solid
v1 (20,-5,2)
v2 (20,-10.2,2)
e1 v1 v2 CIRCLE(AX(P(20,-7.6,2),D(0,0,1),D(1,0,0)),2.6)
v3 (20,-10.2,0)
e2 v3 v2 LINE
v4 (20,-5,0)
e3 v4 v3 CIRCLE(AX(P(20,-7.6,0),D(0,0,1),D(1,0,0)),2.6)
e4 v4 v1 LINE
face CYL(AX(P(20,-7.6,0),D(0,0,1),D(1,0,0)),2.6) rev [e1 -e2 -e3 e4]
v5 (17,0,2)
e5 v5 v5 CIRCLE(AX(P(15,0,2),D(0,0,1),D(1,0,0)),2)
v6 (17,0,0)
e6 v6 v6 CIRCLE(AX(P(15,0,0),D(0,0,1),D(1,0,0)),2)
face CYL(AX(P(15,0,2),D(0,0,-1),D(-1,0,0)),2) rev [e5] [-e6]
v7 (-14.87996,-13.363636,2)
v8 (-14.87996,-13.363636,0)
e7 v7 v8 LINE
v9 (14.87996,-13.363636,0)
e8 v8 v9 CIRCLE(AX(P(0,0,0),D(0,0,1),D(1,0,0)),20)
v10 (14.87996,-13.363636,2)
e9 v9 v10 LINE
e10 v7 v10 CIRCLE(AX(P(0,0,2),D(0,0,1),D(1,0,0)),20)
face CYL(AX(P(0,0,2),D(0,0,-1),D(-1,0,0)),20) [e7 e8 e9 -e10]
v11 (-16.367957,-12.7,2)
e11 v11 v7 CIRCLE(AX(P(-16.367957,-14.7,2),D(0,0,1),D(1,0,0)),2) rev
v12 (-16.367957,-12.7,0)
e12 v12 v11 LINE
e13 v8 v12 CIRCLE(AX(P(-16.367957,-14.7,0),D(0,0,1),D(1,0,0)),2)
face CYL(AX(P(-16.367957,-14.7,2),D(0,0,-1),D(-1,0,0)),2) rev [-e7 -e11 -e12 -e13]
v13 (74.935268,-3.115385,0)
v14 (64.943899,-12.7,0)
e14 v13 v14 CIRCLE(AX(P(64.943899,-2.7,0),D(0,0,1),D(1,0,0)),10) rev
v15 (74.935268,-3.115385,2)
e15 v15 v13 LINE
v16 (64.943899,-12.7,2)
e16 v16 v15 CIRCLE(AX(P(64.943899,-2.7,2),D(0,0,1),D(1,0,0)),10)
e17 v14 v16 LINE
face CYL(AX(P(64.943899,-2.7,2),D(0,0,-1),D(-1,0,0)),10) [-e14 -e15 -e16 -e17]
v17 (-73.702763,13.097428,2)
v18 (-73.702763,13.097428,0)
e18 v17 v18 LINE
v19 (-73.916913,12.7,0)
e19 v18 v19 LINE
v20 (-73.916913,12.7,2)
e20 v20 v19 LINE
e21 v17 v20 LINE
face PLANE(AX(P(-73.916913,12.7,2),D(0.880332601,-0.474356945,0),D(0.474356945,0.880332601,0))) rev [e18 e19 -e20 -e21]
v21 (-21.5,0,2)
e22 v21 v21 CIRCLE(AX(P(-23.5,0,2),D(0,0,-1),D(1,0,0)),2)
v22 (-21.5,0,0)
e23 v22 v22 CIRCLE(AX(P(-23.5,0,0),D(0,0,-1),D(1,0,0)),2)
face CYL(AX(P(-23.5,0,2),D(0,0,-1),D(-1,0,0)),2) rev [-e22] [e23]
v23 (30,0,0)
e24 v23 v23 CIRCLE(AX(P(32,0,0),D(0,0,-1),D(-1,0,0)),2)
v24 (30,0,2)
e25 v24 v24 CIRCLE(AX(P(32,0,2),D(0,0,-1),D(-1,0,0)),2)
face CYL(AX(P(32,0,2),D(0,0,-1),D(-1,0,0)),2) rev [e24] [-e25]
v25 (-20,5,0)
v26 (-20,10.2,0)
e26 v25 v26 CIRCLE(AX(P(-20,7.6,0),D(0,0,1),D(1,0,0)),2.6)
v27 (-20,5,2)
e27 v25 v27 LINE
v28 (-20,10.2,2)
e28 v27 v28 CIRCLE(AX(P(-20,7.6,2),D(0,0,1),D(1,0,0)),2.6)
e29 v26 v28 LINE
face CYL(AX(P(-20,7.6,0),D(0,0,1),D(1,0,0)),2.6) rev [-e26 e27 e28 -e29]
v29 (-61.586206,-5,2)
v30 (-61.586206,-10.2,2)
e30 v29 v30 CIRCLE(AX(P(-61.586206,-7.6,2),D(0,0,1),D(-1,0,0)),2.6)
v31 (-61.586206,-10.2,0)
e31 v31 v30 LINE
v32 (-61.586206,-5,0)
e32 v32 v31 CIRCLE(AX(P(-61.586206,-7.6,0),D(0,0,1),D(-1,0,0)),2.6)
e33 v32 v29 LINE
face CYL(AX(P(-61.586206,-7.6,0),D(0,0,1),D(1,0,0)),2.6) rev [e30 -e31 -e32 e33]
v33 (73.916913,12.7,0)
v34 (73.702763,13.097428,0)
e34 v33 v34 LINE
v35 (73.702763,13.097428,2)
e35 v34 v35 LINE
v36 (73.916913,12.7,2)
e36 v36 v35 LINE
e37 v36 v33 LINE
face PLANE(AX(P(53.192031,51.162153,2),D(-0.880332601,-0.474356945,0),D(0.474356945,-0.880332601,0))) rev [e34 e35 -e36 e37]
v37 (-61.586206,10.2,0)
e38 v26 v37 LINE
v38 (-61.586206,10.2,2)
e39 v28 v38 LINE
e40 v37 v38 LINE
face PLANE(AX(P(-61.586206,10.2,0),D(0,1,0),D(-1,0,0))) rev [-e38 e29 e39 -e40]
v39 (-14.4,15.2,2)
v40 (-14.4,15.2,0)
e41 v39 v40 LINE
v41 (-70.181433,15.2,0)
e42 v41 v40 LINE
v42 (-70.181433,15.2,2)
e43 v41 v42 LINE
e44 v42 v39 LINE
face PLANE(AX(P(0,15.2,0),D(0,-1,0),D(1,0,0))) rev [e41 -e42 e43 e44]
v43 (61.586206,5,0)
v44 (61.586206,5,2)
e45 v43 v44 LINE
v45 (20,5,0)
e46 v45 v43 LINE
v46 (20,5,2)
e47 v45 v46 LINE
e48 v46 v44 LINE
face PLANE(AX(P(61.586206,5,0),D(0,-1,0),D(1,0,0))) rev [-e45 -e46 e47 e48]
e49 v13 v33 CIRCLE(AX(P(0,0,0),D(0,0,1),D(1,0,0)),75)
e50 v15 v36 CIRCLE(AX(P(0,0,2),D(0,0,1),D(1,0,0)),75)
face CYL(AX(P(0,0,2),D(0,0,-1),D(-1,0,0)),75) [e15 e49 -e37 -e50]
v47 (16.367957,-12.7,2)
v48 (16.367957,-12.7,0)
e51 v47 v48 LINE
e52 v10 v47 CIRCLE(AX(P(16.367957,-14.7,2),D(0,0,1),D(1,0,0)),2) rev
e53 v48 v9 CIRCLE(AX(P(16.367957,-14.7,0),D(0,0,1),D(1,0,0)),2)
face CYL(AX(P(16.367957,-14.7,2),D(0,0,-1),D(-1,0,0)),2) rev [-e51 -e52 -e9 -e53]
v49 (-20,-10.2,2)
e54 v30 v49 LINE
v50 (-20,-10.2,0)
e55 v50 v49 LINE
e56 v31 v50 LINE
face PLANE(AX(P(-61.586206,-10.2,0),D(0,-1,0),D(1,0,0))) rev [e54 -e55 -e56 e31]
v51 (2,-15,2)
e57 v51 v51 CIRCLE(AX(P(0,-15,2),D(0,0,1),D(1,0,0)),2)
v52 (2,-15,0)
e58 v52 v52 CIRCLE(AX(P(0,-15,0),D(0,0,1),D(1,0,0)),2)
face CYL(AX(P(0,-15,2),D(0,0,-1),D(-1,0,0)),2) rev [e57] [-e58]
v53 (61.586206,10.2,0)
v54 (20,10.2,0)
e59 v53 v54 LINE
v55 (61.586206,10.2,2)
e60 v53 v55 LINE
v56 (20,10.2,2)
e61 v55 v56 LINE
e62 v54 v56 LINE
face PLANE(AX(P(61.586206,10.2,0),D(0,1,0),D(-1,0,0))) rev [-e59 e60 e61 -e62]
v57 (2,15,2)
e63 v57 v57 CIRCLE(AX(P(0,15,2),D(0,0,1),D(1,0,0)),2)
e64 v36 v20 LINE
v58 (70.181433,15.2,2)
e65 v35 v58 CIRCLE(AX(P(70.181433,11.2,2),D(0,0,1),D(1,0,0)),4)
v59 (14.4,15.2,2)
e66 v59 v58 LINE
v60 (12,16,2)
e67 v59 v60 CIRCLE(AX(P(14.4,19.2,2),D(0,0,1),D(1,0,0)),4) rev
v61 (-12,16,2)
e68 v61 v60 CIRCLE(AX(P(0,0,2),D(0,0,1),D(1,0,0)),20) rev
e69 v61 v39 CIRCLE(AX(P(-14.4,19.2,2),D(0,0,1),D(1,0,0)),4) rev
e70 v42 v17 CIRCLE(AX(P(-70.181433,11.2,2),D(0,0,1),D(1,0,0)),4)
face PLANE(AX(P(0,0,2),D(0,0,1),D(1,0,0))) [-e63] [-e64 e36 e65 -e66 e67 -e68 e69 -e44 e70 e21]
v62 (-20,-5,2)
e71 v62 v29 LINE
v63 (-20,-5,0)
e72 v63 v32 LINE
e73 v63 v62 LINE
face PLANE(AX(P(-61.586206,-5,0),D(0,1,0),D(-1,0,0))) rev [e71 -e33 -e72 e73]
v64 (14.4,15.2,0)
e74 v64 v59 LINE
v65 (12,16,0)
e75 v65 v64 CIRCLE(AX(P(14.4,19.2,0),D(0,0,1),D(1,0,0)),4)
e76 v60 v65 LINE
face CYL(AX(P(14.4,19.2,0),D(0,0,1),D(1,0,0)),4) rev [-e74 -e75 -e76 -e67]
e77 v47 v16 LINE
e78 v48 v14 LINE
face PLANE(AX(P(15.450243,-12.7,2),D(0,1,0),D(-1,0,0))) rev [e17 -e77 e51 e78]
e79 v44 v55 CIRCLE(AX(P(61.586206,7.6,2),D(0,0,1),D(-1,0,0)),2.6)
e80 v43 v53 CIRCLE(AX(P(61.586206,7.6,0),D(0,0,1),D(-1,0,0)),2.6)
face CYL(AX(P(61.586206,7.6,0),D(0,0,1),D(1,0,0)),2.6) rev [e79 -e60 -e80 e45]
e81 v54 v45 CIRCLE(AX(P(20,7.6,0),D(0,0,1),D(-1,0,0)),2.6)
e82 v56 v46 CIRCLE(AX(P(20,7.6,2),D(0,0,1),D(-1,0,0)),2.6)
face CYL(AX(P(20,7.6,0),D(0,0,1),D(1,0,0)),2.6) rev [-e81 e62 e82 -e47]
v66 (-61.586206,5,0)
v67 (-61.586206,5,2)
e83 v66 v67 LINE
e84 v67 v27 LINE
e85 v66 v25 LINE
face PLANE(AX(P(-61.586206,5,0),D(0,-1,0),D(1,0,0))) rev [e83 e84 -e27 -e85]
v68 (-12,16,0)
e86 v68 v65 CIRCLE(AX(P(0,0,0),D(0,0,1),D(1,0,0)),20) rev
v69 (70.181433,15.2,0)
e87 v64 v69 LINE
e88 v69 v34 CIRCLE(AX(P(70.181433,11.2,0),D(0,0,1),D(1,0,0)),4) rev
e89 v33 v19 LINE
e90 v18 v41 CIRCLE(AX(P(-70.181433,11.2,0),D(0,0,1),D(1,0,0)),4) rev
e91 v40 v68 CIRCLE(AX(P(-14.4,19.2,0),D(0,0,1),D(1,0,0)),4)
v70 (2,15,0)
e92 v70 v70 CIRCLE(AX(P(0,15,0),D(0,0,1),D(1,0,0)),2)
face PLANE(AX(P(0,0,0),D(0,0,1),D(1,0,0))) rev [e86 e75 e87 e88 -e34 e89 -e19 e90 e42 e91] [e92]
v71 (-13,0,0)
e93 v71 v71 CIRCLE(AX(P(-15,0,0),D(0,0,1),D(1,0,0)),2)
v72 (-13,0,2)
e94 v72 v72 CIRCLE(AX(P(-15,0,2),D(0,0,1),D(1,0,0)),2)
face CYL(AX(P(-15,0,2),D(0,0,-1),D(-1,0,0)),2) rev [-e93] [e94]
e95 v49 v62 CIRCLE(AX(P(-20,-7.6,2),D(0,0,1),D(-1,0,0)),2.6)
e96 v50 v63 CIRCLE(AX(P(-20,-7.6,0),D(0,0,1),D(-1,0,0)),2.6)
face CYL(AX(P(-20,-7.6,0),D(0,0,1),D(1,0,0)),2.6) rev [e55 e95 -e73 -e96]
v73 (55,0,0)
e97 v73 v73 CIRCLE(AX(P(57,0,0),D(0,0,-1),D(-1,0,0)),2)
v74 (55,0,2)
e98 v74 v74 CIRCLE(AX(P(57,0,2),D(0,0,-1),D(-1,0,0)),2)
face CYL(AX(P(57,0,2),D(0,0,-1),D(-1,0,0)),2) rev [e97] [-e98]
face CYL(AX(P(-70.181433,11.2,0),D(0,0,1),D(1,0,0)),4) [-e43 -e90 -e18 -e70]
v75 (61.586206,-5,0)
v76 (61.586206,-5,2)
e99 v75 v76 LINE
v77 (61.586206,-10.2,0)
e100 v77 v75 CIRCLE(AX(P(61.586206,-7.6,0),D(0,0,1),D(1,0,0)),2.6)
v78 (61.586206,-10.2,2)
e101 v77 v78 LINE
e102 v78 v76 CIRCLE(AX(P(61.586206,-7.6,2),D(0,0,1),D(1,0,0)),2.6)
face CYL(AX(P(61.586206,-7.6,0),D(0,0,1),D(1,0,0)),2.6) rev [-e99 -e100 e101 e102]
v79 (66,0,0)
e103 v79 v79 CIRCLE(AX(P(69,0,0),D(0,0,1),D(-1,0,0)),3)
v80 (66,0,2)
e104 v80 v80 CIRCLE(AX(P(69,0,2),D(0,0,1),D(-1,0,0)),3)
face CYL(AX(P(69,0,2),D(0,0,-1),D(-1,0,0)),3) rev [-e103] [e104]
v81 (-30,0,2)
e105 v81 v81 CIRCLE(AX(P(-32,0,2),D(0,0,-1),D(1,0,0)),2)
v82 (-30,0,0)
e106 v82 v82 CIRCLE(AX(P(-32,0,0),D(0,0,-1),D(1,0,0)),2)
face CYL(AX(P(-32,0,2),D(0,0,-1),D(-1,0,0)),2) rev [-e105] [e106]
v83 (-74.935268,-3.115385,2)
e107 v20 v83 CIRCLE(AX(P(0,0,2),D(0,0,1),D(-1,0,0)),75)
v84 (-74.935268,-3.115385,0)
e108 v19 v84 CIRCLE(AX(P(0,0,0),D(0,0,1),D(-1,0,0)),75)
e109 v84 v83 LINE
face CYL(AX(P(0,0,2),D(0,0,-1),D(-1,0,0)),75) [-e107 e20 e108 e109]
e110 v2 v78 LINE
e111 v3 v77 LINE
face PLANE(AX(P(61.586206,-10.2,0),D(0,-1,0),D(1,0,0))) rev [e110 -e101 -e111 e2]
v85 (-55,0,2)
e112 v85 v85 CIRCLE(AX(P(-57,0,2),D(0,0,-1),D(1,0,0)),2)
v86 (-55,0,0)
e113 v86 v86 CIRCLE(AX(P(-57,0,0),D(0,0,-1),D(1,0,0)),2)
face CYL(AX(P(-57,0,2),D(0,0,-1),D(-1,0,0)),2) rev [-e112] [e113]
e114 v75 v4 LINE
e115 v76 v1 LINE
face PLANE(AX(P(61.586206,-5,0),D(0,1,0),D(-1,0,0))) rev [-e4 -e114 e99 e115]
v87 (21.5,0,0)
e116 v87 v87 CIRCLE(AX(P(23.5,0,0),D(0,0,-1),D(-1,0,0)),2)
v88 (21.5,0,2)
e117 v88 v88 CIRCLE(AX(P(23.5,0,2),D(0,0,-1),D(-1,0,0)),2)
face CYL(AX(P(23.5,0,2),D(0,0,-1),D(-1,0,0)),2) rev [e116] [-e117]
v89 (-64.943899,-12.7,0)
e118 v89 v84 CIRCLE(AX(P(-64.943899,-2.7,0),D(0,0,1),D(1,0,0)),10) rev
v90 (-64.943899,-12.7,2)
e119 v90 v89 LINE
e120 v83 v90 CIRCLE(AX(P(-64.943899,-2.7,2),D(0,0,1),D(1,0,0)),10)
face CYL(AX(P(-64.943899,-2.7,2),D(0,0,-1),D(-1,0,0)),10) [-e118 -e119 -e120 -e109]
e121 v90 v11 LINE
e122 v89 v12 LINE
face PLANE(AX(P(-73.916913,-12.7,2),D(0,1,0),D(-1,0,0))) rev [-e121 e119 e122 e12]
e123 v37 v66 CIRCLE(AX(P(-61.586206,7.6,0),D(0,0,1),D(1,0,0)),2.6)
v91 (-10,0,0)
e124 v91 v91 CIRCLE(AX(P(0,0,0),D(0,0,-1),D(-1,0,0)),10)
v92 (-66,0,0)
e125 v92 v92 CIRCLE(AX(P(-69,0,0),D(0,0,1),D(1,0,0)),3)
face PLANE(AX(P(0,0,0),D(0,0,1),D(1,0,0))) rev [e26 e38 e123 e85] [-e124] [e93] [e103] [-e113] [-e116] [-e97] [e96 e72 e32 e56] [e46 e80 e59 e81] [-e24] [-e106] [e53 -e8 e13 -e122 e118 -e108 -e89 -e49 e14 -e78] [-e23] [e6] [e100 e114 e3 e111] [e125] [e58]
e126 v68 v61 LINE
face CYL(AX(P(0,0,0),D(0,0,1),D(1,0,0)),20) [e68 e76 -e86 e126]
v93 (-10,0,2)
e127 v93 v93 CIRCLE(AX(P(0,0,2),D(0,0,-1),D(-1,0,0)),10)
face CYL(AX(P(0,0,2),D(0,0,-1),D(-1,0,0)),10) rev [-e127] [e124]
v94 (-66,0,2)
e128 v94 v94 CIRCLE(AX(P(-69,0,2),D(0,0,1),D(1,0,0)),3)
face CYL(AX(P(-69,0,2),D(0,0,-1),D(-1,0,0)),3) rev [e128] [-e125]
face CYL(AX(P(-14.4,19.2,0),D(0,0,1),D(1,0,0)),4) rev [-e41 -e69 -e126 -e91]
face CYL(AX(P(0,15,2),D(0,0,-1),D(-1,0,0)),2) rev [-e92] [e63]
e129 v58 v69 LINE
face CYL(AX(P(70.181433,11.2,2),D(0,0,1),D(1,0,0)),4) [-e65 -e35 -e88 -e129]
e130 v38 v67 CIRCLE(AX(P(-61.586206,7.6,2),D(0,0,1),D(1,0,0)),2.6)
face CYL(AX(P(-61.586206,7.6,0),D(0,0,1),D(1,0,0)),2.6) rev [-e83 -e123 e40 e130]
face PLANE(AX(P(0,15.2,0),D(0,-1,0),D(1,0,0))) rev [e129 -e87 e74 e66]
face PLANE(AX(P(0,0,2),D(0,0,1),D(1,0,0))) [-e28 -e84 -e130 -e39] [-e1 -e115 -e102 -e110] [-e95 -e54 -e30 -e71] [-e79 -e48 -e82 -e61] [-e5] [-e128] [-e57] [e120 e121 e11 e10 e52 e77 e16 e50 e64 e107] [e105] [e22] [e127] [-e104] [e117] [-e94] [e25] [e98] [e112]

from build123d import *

# Parameters (mm, degrees)
SKETCH1_R           = 2
SKETCH1_R_2         = 3
BOSS_EXTRUDE1_DEPTH = 2
SKETCH3_R           = 10
SKETCH3_R_2         = 2
CUT_EXTRUDE1_DEPTH  = 93.316865626
CUT_EXTRUDE2_DEPTH  = 93.316865626
CUT_EXTRUDE3_DEPTH  = 93.316865626
FILLET1_R           = 2
FILLET2_DEPTH       = 2
FILLET3_DEPTH       = 2
FILLET4_DEPTH       = 2
FILLET5_DEPTH       = 2
FILLET6_R           = 10
CUT_EXTRUDE4_START  = -10
CUT_EXTRUDE4_DEPTH  = 10
FILLET7_R           = 4


with BuildPart() as part:
    # Sketch1 → Boss-Extrude1 (new body)
    with BuildSketch(Plane.XY):
        with BuildLine():
            Line((-73.916912814, -12.7), (-15.450242717, -12.7))
            ThreePointArc((-15.450242717, -12.7), (0, -20), (15.450242717, -12.7))
            Line((15.450242717, -12.7), (73.916912814, -12.7))
            ThreePointArc((73.916912814, -12.7), (75, 0), (73.916912814, 12.7))
            Line((73.916912814, 12.7), (53.192030909, 51.162152625))
            ThreePointArc((53.192030909, 51.162152625), (51.353674008, 53.083322806), (48.790367902, 53.790367902))
            Line((48.790367902, 53.790367902), (-48.790367902, 53.790367902))
            ThreePointArc((-48.790367902, 53.790367902), (-51.353674008, 53.083322806), (-53.192030909, 51.162152625))
            Line((-53.192030909, 51.162152625), (-73.916912814, 12.7))
            ThreePointArc((-73.916912814, 12.7), (-75, 0), (-73.916912814, -12.7))
        make_face()
        with Locations((0, 15)):
            Circle(SKETCH1_R, mode=Mode.SUBTRACT)
        with Locations((15, 0)):
            Circle(SKETCH1_R, mode=Mode.SUBTRACT)
        with Locations((0, -15)):
            Circle(SKETCH1_R, mode=Mode.SUBTRACT)
        with Locations((-15, 0)):
            Circle(SKETCH1_R, mode=Mode.SUBTRACT)
        with Locations((-48.790367902, 48.790367902)):
            Circle(SKETCH1_R_2, mode=Mode.SUBTRACT)
        with Locations((-69, 0)):
            Circle(SKETCH1_R_2, mode=Mode.SUBTRACT)
        with Locations(Location((69, 0, 0), (0, 0, 180))):
            Circle(SKETCH1_R_2, mode=Mode.SUBTRACT)
        with Locations(Location((48.790367902, 48.790367902, 0), (0, 0, 180))):
            Circle(SKETCH1_R_2, mode=Mode.SUBTRACT)
    extrude(amount=BOSS_EXTRUDE1_DEPTH)

    # Sketch3 → Cut-Extrude1 (cut, through all)
    with BuildSketch(Plane(origin=(0, 0, 0), x_dir=(-1, 0, 0), z_dir=(0, 0, -1))):
        Circle(SKETCH3_R)
        with Locations((-57, 0)):
            Circle(SKETCH3_R_2)
        with Locations((-32, 0)):
            Circle(SKETCH3_R_2)
        with Locations((-23.5, 0)):
            Circle(SKETCH3_R_2)
        with Locations(Location((23.5, 0, 0), (0, 0, 180))):
            Circle(SKETCH3_R_2)
        with Locations(Location((32, 0, 0), (0, 0, 180))):
            Circle(SKETCH3_R_2)
        with Locations(Location((57, 0, 0), (0, 0, 180))):
            Circle(SKETCH3_R_2)
    extrude(amount=-CUT_EXTRUDE1_DEPTH, mode=Mode.SUBTRACT)

    # Sketch5 → Cut-Extrude2 (cut, through all)
    with BuildSketch(Plane.XY.offset(2)):
        with BuildLine():
            ThreePointArc((-47.496272676, 43.96073877), (-49.370145809, 43.824095902), (-51.162152637, 44.388704901))
            Line((-51.162152637, 44.388704901), (-66.890145502, 15.2))
            Line((-66.890145502, 15.2), (-18.735533906, 15.2))
            Line((-18.735533906, 15.2), (-47.496272676, 43.96073877))
        make_face()
        with BuildLine():
            ThreePointArc((43.96073877, 47.496272676), (43.833143595, 48.137736941), (43.790367902, 48.790367902))
            Line((43.790367902, 48.790367902), (-43.790367902, 48.790367902))
            ThreePointArc((-43.790367902, 48.790367902), (-43.833143595, 48.137736941), (-43.96073877, 47.496272676))
            Line((-43.96073877, 47.496272676), (-12.263448247, 15.798982153))
            ThreePointArc((-12.263448247, 15.798982153), (0, 20), (12.263448247, 15.798982153))
            Line((12.263448247, 15.798982153), (43.96073877, 47.496272676))
        make_face()
        with BuildLine():
            Line((47.496272676, 43.96073877), (18.735533906, 15.2))
            Line((18.735533906, 15.2), (66.886464241, 15.2))
            Line((66.886464241, 15.2), (51.159299215, 44.387168561))
            ThreePointArc((51.159299215, 44.387168561), (49.368536342, 43.823908272), (47.496272676, 43.96073877))
        make_face()
    extrude(amount=-CUT_EXTRUDE2_DEPTH, mode=Mode.SUBTRACT)

    # Sketch8 → Cut-Extrude3 (cut, through all)
    with BuildSketch(Plane.XY.offset(2)):
        with BuildLine():
            Line((61.58620553, 10.2), (20, 10.2))
            ThreePointArc((20, 10.2), (17.4, 7.6), (20, 5))
            Line((20, 5), (61.58620553, 5))
            ThreePointArc((61.58620553, 5), (64.18620553, 7.6), (61.58620553, 10.2))
        make_face()
        with BuildLine():
            Line((-61.58620553, -10.2), (-20, -10.2))
            ThreePointArc((-20, -10.2), (-17.4, -7.6), (-20, -5))
            Line((-20, -5), (-61.58620553, -5))
            ThreePointArc((-61.58620553, -5), (-64.18620553, -7.6), (-61.58620553, -10.2))
        make_face()
        with BuildLine():
            Line((61.58620553, -10.2), (20, -10.2))
            ThreePointArc((20, -10.2), (17.4, -7.6), (20, -5))
            Line((20, -5), (61.58620553, -5))
            ThreePointArc((61.58620553, -5), (64.18620553, -7.6), (61.58620553, -10.2))
        make_face()
        with BuildLine():
            Line((-61.58620553, 10.2), (-20, 10.2))
            ThreePointArc((-20, 10.2), (-17.4, 7.6), (-20, 5))
            Line((-20, 5), (-61.58620553, 5))
            ThreePointArc((-61.58620553, 5), (-64.18620553, 7.6), (-61.58620553, 10.2))
        make_face()
    extrude(amount=-CUT_EXTRUDE3_DEPTH, mode=Mode.SUBTRACT)

    # Fillet1
    fillet1_edges = [part.edges().sort_by_distance(p)[0] for p in [
        (12.263448247, 15.798982153, 1),
        (-12.263448247, 15.798982153, 1),
        (66.886464241, 15.2, 1),
        (18.735533906, 15.2, 1),
        (-18.735533906, 15.2, 1),
        (-66.890145502, 15.2, 1),
        (-15.450242717, -12.7, 1),
        (15.450242717, -12.7, 1),
    ]]
    fillet(fillet1_edges, radius=FILLET1_R)

    # Fillet2: read off the stored shape, not the designer's step
    # Fillet2 outline → Fillet2 (add)
    with BuildSketch(Plane.XY):
        with BuildLine():
            Line((-43.96073877, 47.496272676), (-43.584387401, 47.119921307))
            add(Edge.make_bspline(
                [(-43.584387401, 47.119921307), (-43.79719002, 47.332723926), (-43.913795032, 47.634492314), (-43.857793188, 47.97201181)],
                knots=[0, 0, 0, 0, 0.414217666, 0.414217666, 0.414217666, 0.414217666], degree=3, weights=[1, 0.829531048, 0.729673348, 0.700426898]))
            ThreePointArc((-43.857793188, 47.97201181), (-43.903473396, 47.732888781), (-43.96073877, 47.496272676))
        make_face()
        with BuildLine():
            ThreePointArc((-43.790367902, 48.790367902), (-43.807252733, 48.379803393), (-43.857793188, 47.97201181))
            add(Edge.make_bspline(
                [(-43.857793188, 47.97201181), (-43.770111484, 48.500463775), (-43.357659279, 48.790367902), (-42.892465766, 48.790367902)],
                knots=[0.414217666, 0.414217666, 0.414217666, 0.414217666, 1, 1, 1, 1], degree=3, weights=[0.700426898, 0.659066873, 0.758924573, 1]))
            Line((-42.892465766, 48.790367902), (-43.790367902, 48.790367902))
        make_face()
    extrude(amount=FILLET2_DEPTH)

    # Fillet3: read off the stored shape, not the designer's step
    # Fillet3 outline → Fillet3 (add)
    with BuildSketch(Plane.XY):
        with BuildLine():
            Line((43.790367902, 48.790367902), (42.892465766, 48.790367902))
            add(Edge.make_bspline(
                [(42.892465766, 48.790367902), (43.357665683, 48.790367902), (43.770121408, 48.5004568), (43.857795774, 47.971996226)],
                knots=[0, 0, 0, 0, 0.585788454, 0.585788454, 0.585788454, 0.585788454], degree=3, weights=[1, 0.758922055, 0.659064787, 0.700428195]))
            ThreePointArc((43.857795774, 47.971996226), (43.807253382, 48.379795521), (43.790367902, 48.790367902))
        make_face()
        with BuildLine():
            ThreePointArc((43.96073877, 47.496272676), (43.903475067, 47.732881061), (43.857795774, 47.971996226))
            add(Edge.make_bspline(
                [(43.857795774, 47.971996226), (43.913791115, 47.634482177), (43.79718623, 47.332720136), (43.584387401, 47.119921307)],
                knots=[0.585788454, 0.585788454, 0.585788454, 0.585788454, 1, 1, 1, 1], degree=3, weights=[0.700428195, 0.729676298, 0.829533567, 1]))
            Line((43.584387401, 47.119921307), (43.96073877, 47.496272676))
        make_face()
    extrude(amount=FILLET3_DEPTH)

    # Fillet4: read off the stored shape, not the designer's step
    # Fillet4 outline → Fillet4 (add)
    with BuildSketch(Plane.XY):
        with BuildLine():
            Line((-51.162152637, 44.388704901), (-52.646203675, 41.634537337))
            add(Edge.make_bspline(
                [(-52.646203675, 41.634537337), (-51.92183636, 42.978850243), (-50.576640467, 43.835721987), (-48.922136441, 43.792104498)],
                knots=[0, 0, 0, 0, 0.585786442, 0.585786442, 0.585786442, 0.585786442], degree=3, weights=[1, 0.842637329, 0.777455577, 0.804454744]))
            ThreePointArc((-48.922136441, 43.792104498), (-50.077196468, 43.958797532), (-51.162152637, 44.388704901))
        make_face()
        with BuildLine():
            ThreePointArc((-47.496272676, 43.96073877), (-48.203119904, 43.824973679), (-48.922136441, 43.792104498))
            add(Edge.make_bspline(
                [(-48.922136441, 43.792104498), (-47.817700519, 43.762988388), (-46.849981733, 43.314447827), (-46.126053502, 42.590519596)],
                knots=[0.585786442, 0.585786442, 0.585786442, 0.585786442, 1, 1, 1, 1], degree=3, weights=[0.804454744, 0.823546038, 0.88872779, 1]))
            Line((-46.126053502, 42.590519596), (-47.496272676, 43.96073877))
        make_face()
    extrude(amount=FILLET4_DEPTH)

    # Fillet5: read off the stored shape, not the designer's step
    # Fillet5 outline → Fillet5 (add)
    with BuildSketch(Plane.XY):
        with BuildLine():
            Line((47.496272676, 43.96073877), (46.127063611, 42.591529705))
            add(Edge.make_bspline(
                [(46.127063611, 42.591529705), (46.850510453, 43.314976547), (47.817619792, 43.763154251), (48.921332432, 43.792083367)],
                knots=[0, 0, 0, 0, 0.414289791, 0.414289791, 0.414289791, 0.414289791], degree=3, weights=[1, 0.888707311, 0.823522047, 0.804444208]))
            ThreePointArc((48.921332432, 43.792083367), (48.202720546, 43.825020926), (47.496272676, 43.96073877))
        make_face()
        with BuildLine():
            ThreePointArc((51.159299215, 44.387168561), (50.075241983, 43.958277402), (48.921332432, 43.792083367))
            add(Edge.make_bspline(
                [(48.921332432, 43.792083367), (50.574149341, 43.835404908), (51.917905025, 42.979314342), (52.641529007, 41.636380946)],
                knots=[0.414289791, 0.414289791, 0.414289791, 0.414289791, 1, 1, 1, 1], degree=3, weights=[0.804444208, 0.777472544, 0.842657808, 1]))
            Line((52.641529007, 41.636380946), (51.159299215, 44.387168561))
        make_face()
    extrude(amount=FILLET5_DEPTH)

    # Fillet6
    fillet6_edges = [part.edges().sort_by_distance(p)[0] for p in [
        (-73.916912814, -12.7, 1),
        (73.916912814, -12.7, 1),
    ]]
    fillet(fillet6_edges, radius=FILLET6_R)

    # Sketch9 → Cut-Extrude4 (cut)
    with BuildSketch(Plane.XY.offset(2).offset(CUT_EXTRUDE4_START)):
        with BuildLine():
            Line((72.569817001, 15.2), (53.192030909, 51.162152625))
            ThreePointArc((53.192030909, 51.162152625), (51.353674008, 53.083322806), (48.790367902, 53.790367902))
            Line((48.790367902, 53.790367902), (-48.790367902, 53.790367902))
            ThreePointArc((-48.790367902, 53.790367902), (-51.353674008, 53.083322806), (-53.192030909, 51.162152625))
            Line((-53.192030909, 51.162152625), (-72.569817001, 15.2))
            Line((-72.569817001, 15.2), (-12.998461447, 15.2))
            ThreePointArc((-12.998461447, 15.2), (0, 20), (12.998461447, 15.2))
            Line((12.998461447, 15.2), (72.569817001, 15.2))
        make_face()
    extrude(amount=CUT_EXTRUDE4_DEPTH, mode=Mode.SUBTRACT)

    # Fillet7
    fillet7_edges = [part.edges().sort_by_distance(p)[0] for p in [
        (-72.569817001, 15.2, 1),
        (72.569817001, 15.2, 1),
        (-12.998461447, 15.2, 1),
        (12.998461447, 15.2, 1),
    ]]
    fillet(fillet7_edges, radius=FILLET7_R)


solid = part.part
